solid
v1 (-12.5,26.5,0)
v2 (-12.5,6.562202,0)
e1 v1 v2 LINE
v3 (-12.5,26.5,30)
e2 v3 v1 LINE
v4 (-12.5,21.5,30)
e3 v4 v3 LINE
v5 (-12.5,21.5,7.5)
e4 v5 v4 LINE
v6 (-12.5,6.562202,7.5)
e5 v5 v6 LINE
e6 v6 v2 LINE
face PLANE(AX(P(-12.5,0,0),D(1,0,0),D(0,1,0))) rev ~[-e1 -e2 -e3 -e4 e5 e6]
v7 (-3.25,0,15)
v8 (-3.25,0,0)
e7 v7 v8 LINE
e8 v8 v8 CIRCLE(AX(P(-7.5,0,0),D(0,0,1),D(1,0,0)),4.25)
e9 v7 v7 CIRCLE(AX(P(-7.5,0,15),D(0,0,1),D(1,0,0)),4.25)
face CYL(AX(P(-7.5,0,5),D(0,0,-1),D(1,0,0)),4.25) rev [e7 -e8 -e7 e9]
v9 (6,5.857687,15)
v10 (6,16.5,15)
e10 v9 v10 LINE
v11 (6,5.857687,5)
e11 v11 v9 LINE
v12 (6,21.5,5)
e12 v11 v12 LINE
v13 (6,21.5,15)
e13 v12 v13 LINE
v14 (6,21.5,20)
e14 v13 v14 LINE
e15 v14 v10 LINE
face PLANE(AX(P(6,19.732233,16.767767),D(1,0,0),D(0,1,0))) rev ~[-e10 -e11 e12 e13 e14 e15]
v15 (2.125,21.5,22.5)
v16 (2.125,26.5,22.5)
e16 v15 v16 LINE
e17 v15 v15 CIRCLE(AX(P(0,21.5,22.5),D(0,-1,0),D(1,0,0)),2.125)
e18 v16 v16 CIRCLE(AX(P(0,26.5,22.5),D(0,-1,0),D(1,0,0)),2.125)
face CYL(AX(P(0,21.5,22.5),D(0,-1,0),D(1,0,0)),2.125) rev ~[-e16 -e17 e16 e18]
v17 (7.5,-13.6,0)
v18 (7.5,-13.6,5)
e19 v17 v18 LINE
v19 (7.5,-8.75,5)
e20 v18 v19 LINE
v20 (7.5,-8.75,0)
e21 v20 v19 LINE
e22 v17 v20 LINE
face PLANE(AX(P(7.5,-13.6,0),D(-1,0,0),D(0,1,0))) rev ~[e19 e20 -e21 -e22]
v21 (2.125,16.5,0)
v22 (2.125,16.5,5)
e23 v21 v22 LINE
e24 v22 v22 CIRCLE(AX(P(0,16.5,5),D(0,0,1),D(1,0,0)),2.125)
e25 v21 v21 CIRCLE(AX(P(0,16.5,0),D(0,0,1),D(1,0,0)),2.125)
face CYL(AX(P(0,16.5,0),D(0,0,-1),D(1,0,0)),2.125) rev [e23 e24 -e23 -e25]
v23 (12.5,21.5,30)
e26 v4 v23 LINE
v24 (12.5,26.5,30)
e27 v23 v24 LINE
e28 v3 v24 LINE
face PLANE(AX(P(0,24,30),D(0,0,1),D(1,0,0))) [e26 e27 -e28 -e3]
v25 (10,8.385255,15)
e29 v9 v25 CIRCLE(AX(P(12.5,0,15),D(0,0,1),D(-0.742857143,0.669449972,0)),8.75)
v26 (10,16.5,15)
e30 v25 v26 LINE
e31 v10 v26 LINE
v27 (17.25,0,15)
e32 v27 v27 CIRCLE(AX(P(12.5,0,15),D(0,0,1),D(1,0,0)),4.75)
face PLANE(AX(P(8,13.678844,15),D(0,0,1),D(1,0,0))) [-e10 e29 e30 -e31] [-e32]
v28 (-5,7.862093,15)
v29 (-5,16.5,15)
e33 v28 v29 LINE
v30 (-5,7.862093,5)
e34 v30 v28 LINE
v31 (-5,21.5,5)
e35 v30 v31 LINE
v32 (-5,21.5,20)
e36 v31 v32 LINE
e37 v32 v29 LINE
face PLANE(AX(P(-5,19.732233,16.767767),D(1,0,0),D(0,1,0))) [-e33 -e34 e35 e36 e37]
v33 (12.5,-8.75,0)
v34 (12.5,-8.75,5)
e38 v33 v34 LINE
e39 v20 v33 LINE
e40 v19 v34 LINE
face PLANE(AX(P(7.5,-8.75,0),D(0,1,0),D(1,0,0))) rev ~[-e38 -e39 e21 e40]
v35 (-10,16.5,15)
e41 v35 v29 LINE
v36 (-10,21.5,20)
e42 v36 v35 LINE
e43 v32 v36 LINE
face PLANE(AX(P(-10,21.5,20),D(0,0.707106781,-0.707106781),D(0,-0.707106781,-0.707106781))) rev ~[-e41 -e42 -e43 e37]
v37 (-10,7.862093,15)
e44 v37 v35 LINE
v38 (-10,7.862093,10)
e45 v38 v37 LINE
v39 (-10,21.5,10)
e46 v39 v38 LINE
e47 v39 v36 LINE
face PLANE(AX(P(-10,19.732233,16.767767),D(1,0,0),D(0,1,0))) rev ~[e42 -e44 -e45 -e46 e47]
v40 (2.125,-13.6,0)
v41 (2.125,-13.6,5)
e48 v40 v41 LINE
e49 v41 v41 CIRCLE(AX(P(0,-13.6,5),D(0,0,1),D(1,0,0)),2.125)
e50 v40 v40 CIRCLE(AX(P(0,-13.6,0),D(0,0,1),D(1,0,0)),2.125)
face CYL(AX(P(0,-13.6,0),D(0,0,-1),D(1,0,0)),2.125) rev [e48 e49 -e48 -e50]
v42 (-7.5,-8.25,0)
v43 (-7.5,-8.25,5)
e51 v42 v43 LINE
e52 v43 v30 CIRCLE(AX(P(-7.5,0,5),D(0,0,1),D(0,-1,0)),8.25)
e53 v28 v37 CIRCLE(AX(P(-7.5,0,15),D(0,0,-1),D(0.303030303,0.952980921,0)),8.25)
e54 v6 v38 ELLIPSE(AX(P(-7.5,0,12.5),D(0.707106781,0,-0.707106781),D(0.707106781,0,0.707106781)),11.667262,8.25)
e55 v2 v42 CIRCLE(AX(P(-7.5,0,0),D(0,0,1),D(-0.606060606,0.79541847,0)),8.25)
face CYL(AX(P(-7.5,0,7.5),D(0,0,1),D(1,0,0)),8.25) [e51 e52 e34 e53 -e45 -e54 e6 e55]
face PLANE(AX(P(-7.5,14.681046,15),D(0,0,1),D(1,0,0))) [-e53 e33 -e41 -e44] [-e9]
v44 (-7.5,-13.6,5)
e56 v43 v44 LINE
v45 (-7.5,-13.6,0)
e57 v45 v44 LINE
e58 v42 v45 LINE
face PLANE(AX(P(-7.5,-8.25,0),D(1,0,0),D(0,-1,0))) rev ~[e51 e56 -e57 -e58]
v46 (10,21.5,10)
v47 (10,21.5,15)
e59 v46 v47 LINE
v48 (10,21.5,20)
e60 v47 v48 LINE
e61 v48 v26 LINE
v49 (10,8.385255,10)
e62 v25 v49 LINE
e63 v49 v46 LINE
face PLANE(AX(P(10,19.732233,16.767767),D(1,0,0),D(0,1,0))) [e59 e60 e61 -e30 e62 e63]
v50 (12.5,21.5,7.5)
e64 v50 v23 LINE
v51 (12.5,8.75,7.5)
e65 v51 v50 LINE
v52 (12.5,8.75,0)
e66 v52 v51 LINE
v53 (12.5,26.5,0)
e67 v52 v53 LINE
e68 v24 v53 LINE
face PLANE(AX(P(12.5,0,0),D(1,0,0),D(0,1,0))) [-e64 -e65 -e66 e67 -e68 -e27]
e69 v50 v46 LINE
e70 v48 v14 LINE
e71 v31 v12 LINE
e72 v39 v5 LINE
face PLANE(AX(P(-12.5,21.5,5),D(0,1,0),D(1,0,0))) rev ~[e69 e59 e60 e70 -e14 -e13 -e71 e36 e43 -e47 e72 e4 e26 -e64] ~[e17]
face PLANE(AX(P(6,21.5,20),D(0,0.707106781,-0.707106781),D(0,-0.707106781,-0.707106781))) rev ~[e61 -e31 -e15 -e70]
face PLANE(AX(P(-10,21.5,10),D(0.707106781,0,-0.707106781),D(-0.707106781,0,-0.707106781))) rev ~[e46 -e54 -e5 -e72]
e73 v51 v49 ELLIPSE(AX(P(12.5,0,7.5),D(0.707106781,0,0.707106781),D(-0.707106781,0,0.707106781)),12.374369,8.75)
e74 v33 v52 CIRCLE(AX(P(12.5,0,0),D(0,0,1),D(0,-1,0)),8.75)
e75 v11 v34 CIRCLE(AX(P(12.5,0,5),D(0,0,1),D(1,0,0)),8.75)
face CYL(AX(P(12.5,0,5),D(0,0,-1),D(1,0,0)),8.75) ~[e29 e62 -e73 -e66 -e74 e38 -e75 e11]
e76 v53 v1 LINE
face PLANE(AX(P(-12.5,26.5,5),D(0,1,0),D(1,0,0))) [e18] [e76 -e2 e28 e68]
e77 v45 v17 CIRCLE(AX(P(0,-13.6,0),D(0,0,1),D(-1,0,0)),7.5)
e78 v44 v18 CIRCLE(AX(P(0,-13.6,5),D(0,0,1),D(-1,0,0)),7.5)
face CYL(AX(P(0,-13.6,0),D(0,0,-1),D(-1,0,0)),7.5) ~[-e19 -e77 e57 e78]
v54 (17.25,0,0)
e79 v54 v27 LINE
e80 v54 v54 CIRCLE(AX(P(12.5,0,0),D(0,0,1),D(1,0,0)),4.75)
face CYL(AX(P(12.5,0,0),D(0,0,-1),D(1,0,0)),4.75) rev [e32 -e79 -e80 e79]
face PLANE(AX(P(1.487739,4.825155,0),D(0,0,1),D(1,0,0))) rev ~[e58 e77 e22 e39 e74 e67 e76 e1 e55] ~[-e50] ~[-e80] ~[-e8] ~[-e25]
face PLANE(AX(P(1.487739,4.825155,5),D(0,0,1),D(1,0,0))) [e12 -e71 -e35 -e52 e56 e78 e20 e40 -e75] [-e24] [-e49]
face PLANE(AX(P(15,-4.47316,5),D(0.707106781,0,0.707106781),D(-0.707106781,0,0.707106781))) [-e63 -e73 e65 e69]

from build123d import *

# Parameters (mm, degrees)
F0_R          = 2.125
F0_R_2        = 4.25
F0_R_3        = 4.75
F1_DEPTH      = 5
F2_W          = 25
F2_H          = 5
F3_DEPTH      = 25
F4_R          = 8.25
F4_R_2        = 4.25
F4_R_3        = 8.75
F4_R_4        = 4.75
F5_DEPTH      = 10
F6_R          = 2.125
F7_DEPTH      = 5.001
F8_W          = 5
F8_H          = 13.6379074032
F8_W_2        = 4
F8_H_2        = 15.6423127431
F9_DEPTH      = 10
F10_T1_DEPTH  = 5
F10_T3_DEPTH  = 4
F10_T8_DEPTH  = 17.8584149398
F10_T13_DEPTH = 16.8584149398
F10_T18_DEPTH = 26.4963223431
F10_S19_R     = 8.25
F10_T20_DEPTH = 15
F10_T25_DEPTH = 26.4963223431
F10_S26_R     = 8.25
F10_T27_DEPTH = 15
F10_T32_DEPTH = 25.9731600242
F10_S34_R     = 8.75
F10_T35_DEPTH = 15


# Not quite as in the source:
# - a fillet or chamfer that OpenCascade refuses, or shapes differently, is made with other operations: its cross-section is extruded or revolved along the edge and cut away or added


with BuildPart() as f1:
    # F0 (on Top) → F1 (new body)
    with BuildSketch(Plane.XY):
        with BuildLine():
            Line((12.5, 26.5), (0, 26.5))
            Line((0, 26.5), (-12.5, 26.5))
            Line((-12.5, 26.5), (-12.5, 6.5622023742))
            ThreePointArc((-12.5, 6.5622023742), (-15.3166703137, -2.6385915194), (-7.5, -8.25))
            Line((-7.5, -8.25), (-7.5, -13.6))
            ThreePointArc((-7.5, -13.6), (-5.3033008589, -18.9033008589), (0, -21.1))
            ThreePointArc((0, -21.1), (5.3033008589, -18.9033008589), (7.5, -13.6))
            Line((7.5, -13.6), (7.5, -8.75))
            Line((7.5, -8.75), (12.5, -8.75))
            ThreePointArc((12.5, -8.75), (21.25, 0), (12.5, 8.75))
            Line((12.5, 8.75), (12.5, 26.5))
        make_face()
        with Locations((0, -13.6)):
            Circle(F0_R, mode=Mode.SUBTRACT)
        with Locations((-7.5, 0)):
            Circle(F0_R_2, mode=Mode.SUBTRACT)
        with Locations((12.5, 0)):
            Circle(F0_R_3, mode=Mode.SUBTRACT)
        with Locations((0, 16.5)):
            Circle(F0_R, mode=Mode.SUBTRACT)
    extrude(amount=F1_DEPTH)

    # F2 (on face) → F3 (join)
    with BuildSketch(Plane.XY.offset(5)):
        with Locations((0, 24)):
            Rectangle(F2_W, F2_H)
    extrude(amount=F3_DEPTH)

    # F4 (on face) → F5 (join)
    with BuildSketch(Plane.XY.offset(5)):
        with Locations((-7.5, 0)):
            Circle(F4_R)
        with Locations((-7.5, 0)):
            Circle(F4_R_2, mode=Mode.SUBTRACT)
        with Locations((12.5, 0)):
            Circle(F4_R_3)
        with Locations((12.5, 0)):
            Circle(F4_R_4, mode=Mode.SUBTRACT)
    extrude(amount=F5_DEPTH)

    # F6 (on face) → F7 (cut, through all)
    with BuildSketch(Plane.XZ.offset(-21.5)):
        with Locations((0, 22.5)):
            Circle(F6_R)
    extrude(amount=-F7_DEPTH, mode=Mode.SUBTRACT)

    # F8 (on face) → F9 (join)
    with BuildSketch(Plane.XY.offset(5)):
        with Locations((-7.5, 14.6810462984)):
            Rectangle(F8_W, F8_H)
        with Locations((8, 13.6788436285)):
            Rectangle(F8_W_2, F8_H_2)
    extrude(amount=F9_DEPTH)

    # F10: chamfer of 5 on 4 edges, made by hand

    # F10_s2 → F10_t1 (join)
    with BuildSketch(Plane.YZ.offset(-10)):
        Polygon((21.5, 20), (16.5, 15), (21.5, 15), align=None)
    extrude(amount=F10_T1_DEPTH)

    # F10_s4 → F10_t3 (join)
    with BuildSketch(Plane.YZ.offset(6)):
        Polygon((21.5, 20), (16.5, 15), (21.5, 15), align=None)
    extrude(amount=F10_T3_DEPTH)


with BuildPart() as f10_tool6:
    # F10_s7 → F10_t8 (new body)
    with BuildSketch(Plane.YZ.offset(7.8584149398)):
        Polygon((21.5, 20), (16.5, 15), (21.5, 15), align=None)
    extrude(amount=-F10_T8_DEPTH)

    split(bisect_by=Plane.YZ.offset(6), keep=Keep.TOP)


with BuildPart() as f1_1:
    add(f1.part)

    # F10_t5: union F10_tool6
    add(f10_tool6.part)


with BuildPart() as f10_tool11:
    # F10_s12 → F10_t13 (new body)
    with BuildSketch(Plane.YZ.offset(10)):
        Polygon((21.5, 20), (16.5, 15), (21.5, 15), align=None)
    extrude(amount=-F10_T13_DEPTH)

    split(bisect_by=Plane.YZ.offset(-5), keep=Keep.BOTTOM)


with BuildPart() as f1_2:
    add(f1_1.part)

    # F10_t10: union F10_tool11
    add(f10_tool11.part)


with BuildPart() as f10_tool16:
    # F10_s17 → F10_t18 (new body)
    with BuildSketch(Plane.XZ.offset(-21.5)):
        Polygon((-10, 10), (-15, 5), (-10, 5), align=None)
    extrude(amount=F10_T18_DEPTH)

    # F10_s19 → F10_t20 (cut, symmetric)
    with BuildSketch(Plane.XY.offset(7.5)):
        with Locations((-7.5, 0)):
            Circle(F10_S19_R)
    extrude(amount=F10_T20_DEPTH, both=True, mode=Mode.SUBTRACT)

    split(bisect_by=Plane.YZ.offset(-12.5), keep=Keep.TOP)


with BuildPart() as f1_3:
    add(f1_2.part)

    # F10_t15: union F10_tool16
    add(f10_tool16.part)


with BuildPart() as f10_tool23:
    # F10_s24 → F10_t25 (new body)
    with BuildSketch(Plane.XZ.offset(-21.5)):
        Polygon((-10, 10), (-15, 5), (-10, 5), align=None)
    extrude(amount=F10_T25_DEPTH)

    # F10_s26 → F10_t27 (intersect, symmetric)
    with BuildSketch(Plane.XY.offset(7.5)):
        with Locations((-7.5, 0)):
            Circle(F10_S26_R)
    extrude(amount=F10_T27_DEPTH, both=True, mode=Mode.INTERSECT)

    split(bisect_by=Plane.YZ.offset(-12.5), keep=Keep.BOTTOM)


with BuildPart() as f1_4:
    add(f1_3.part)

    # F10_t22: union F10_tool23
    add(f10_tool23.part)


with BuildPart() as f10_tool30:
    # F10_s31 → F10_t32 (new body)
    with BuildSketch(Plane.XZ.offset(4.4731600242)):
        Polygon((15, 5), (10, 10), (10, 5), align=None)
    extrude(amount=-F10_T32_DEPTH)

    split(bisect_by=Plane.YZ.offset(12.5), keep=Keep.BOTTOM)

    # F10_s34 → F10_t35 (cut, symmetric)
    with BuildSketch(Plane.XY.offset(7.5)):
        with Locations((12.5, 0)):
            Circle(F10_S34_R)
    extrude(amount=F10_T35_DEPTH, both=True, mode=Mode.SUBTRACT)


with BuildPart() as f1_5:
    add(f1_4.part)

    # F10_t29: union F10_tool30
    add(f10_tool30.part)


solid = f1_5.part
